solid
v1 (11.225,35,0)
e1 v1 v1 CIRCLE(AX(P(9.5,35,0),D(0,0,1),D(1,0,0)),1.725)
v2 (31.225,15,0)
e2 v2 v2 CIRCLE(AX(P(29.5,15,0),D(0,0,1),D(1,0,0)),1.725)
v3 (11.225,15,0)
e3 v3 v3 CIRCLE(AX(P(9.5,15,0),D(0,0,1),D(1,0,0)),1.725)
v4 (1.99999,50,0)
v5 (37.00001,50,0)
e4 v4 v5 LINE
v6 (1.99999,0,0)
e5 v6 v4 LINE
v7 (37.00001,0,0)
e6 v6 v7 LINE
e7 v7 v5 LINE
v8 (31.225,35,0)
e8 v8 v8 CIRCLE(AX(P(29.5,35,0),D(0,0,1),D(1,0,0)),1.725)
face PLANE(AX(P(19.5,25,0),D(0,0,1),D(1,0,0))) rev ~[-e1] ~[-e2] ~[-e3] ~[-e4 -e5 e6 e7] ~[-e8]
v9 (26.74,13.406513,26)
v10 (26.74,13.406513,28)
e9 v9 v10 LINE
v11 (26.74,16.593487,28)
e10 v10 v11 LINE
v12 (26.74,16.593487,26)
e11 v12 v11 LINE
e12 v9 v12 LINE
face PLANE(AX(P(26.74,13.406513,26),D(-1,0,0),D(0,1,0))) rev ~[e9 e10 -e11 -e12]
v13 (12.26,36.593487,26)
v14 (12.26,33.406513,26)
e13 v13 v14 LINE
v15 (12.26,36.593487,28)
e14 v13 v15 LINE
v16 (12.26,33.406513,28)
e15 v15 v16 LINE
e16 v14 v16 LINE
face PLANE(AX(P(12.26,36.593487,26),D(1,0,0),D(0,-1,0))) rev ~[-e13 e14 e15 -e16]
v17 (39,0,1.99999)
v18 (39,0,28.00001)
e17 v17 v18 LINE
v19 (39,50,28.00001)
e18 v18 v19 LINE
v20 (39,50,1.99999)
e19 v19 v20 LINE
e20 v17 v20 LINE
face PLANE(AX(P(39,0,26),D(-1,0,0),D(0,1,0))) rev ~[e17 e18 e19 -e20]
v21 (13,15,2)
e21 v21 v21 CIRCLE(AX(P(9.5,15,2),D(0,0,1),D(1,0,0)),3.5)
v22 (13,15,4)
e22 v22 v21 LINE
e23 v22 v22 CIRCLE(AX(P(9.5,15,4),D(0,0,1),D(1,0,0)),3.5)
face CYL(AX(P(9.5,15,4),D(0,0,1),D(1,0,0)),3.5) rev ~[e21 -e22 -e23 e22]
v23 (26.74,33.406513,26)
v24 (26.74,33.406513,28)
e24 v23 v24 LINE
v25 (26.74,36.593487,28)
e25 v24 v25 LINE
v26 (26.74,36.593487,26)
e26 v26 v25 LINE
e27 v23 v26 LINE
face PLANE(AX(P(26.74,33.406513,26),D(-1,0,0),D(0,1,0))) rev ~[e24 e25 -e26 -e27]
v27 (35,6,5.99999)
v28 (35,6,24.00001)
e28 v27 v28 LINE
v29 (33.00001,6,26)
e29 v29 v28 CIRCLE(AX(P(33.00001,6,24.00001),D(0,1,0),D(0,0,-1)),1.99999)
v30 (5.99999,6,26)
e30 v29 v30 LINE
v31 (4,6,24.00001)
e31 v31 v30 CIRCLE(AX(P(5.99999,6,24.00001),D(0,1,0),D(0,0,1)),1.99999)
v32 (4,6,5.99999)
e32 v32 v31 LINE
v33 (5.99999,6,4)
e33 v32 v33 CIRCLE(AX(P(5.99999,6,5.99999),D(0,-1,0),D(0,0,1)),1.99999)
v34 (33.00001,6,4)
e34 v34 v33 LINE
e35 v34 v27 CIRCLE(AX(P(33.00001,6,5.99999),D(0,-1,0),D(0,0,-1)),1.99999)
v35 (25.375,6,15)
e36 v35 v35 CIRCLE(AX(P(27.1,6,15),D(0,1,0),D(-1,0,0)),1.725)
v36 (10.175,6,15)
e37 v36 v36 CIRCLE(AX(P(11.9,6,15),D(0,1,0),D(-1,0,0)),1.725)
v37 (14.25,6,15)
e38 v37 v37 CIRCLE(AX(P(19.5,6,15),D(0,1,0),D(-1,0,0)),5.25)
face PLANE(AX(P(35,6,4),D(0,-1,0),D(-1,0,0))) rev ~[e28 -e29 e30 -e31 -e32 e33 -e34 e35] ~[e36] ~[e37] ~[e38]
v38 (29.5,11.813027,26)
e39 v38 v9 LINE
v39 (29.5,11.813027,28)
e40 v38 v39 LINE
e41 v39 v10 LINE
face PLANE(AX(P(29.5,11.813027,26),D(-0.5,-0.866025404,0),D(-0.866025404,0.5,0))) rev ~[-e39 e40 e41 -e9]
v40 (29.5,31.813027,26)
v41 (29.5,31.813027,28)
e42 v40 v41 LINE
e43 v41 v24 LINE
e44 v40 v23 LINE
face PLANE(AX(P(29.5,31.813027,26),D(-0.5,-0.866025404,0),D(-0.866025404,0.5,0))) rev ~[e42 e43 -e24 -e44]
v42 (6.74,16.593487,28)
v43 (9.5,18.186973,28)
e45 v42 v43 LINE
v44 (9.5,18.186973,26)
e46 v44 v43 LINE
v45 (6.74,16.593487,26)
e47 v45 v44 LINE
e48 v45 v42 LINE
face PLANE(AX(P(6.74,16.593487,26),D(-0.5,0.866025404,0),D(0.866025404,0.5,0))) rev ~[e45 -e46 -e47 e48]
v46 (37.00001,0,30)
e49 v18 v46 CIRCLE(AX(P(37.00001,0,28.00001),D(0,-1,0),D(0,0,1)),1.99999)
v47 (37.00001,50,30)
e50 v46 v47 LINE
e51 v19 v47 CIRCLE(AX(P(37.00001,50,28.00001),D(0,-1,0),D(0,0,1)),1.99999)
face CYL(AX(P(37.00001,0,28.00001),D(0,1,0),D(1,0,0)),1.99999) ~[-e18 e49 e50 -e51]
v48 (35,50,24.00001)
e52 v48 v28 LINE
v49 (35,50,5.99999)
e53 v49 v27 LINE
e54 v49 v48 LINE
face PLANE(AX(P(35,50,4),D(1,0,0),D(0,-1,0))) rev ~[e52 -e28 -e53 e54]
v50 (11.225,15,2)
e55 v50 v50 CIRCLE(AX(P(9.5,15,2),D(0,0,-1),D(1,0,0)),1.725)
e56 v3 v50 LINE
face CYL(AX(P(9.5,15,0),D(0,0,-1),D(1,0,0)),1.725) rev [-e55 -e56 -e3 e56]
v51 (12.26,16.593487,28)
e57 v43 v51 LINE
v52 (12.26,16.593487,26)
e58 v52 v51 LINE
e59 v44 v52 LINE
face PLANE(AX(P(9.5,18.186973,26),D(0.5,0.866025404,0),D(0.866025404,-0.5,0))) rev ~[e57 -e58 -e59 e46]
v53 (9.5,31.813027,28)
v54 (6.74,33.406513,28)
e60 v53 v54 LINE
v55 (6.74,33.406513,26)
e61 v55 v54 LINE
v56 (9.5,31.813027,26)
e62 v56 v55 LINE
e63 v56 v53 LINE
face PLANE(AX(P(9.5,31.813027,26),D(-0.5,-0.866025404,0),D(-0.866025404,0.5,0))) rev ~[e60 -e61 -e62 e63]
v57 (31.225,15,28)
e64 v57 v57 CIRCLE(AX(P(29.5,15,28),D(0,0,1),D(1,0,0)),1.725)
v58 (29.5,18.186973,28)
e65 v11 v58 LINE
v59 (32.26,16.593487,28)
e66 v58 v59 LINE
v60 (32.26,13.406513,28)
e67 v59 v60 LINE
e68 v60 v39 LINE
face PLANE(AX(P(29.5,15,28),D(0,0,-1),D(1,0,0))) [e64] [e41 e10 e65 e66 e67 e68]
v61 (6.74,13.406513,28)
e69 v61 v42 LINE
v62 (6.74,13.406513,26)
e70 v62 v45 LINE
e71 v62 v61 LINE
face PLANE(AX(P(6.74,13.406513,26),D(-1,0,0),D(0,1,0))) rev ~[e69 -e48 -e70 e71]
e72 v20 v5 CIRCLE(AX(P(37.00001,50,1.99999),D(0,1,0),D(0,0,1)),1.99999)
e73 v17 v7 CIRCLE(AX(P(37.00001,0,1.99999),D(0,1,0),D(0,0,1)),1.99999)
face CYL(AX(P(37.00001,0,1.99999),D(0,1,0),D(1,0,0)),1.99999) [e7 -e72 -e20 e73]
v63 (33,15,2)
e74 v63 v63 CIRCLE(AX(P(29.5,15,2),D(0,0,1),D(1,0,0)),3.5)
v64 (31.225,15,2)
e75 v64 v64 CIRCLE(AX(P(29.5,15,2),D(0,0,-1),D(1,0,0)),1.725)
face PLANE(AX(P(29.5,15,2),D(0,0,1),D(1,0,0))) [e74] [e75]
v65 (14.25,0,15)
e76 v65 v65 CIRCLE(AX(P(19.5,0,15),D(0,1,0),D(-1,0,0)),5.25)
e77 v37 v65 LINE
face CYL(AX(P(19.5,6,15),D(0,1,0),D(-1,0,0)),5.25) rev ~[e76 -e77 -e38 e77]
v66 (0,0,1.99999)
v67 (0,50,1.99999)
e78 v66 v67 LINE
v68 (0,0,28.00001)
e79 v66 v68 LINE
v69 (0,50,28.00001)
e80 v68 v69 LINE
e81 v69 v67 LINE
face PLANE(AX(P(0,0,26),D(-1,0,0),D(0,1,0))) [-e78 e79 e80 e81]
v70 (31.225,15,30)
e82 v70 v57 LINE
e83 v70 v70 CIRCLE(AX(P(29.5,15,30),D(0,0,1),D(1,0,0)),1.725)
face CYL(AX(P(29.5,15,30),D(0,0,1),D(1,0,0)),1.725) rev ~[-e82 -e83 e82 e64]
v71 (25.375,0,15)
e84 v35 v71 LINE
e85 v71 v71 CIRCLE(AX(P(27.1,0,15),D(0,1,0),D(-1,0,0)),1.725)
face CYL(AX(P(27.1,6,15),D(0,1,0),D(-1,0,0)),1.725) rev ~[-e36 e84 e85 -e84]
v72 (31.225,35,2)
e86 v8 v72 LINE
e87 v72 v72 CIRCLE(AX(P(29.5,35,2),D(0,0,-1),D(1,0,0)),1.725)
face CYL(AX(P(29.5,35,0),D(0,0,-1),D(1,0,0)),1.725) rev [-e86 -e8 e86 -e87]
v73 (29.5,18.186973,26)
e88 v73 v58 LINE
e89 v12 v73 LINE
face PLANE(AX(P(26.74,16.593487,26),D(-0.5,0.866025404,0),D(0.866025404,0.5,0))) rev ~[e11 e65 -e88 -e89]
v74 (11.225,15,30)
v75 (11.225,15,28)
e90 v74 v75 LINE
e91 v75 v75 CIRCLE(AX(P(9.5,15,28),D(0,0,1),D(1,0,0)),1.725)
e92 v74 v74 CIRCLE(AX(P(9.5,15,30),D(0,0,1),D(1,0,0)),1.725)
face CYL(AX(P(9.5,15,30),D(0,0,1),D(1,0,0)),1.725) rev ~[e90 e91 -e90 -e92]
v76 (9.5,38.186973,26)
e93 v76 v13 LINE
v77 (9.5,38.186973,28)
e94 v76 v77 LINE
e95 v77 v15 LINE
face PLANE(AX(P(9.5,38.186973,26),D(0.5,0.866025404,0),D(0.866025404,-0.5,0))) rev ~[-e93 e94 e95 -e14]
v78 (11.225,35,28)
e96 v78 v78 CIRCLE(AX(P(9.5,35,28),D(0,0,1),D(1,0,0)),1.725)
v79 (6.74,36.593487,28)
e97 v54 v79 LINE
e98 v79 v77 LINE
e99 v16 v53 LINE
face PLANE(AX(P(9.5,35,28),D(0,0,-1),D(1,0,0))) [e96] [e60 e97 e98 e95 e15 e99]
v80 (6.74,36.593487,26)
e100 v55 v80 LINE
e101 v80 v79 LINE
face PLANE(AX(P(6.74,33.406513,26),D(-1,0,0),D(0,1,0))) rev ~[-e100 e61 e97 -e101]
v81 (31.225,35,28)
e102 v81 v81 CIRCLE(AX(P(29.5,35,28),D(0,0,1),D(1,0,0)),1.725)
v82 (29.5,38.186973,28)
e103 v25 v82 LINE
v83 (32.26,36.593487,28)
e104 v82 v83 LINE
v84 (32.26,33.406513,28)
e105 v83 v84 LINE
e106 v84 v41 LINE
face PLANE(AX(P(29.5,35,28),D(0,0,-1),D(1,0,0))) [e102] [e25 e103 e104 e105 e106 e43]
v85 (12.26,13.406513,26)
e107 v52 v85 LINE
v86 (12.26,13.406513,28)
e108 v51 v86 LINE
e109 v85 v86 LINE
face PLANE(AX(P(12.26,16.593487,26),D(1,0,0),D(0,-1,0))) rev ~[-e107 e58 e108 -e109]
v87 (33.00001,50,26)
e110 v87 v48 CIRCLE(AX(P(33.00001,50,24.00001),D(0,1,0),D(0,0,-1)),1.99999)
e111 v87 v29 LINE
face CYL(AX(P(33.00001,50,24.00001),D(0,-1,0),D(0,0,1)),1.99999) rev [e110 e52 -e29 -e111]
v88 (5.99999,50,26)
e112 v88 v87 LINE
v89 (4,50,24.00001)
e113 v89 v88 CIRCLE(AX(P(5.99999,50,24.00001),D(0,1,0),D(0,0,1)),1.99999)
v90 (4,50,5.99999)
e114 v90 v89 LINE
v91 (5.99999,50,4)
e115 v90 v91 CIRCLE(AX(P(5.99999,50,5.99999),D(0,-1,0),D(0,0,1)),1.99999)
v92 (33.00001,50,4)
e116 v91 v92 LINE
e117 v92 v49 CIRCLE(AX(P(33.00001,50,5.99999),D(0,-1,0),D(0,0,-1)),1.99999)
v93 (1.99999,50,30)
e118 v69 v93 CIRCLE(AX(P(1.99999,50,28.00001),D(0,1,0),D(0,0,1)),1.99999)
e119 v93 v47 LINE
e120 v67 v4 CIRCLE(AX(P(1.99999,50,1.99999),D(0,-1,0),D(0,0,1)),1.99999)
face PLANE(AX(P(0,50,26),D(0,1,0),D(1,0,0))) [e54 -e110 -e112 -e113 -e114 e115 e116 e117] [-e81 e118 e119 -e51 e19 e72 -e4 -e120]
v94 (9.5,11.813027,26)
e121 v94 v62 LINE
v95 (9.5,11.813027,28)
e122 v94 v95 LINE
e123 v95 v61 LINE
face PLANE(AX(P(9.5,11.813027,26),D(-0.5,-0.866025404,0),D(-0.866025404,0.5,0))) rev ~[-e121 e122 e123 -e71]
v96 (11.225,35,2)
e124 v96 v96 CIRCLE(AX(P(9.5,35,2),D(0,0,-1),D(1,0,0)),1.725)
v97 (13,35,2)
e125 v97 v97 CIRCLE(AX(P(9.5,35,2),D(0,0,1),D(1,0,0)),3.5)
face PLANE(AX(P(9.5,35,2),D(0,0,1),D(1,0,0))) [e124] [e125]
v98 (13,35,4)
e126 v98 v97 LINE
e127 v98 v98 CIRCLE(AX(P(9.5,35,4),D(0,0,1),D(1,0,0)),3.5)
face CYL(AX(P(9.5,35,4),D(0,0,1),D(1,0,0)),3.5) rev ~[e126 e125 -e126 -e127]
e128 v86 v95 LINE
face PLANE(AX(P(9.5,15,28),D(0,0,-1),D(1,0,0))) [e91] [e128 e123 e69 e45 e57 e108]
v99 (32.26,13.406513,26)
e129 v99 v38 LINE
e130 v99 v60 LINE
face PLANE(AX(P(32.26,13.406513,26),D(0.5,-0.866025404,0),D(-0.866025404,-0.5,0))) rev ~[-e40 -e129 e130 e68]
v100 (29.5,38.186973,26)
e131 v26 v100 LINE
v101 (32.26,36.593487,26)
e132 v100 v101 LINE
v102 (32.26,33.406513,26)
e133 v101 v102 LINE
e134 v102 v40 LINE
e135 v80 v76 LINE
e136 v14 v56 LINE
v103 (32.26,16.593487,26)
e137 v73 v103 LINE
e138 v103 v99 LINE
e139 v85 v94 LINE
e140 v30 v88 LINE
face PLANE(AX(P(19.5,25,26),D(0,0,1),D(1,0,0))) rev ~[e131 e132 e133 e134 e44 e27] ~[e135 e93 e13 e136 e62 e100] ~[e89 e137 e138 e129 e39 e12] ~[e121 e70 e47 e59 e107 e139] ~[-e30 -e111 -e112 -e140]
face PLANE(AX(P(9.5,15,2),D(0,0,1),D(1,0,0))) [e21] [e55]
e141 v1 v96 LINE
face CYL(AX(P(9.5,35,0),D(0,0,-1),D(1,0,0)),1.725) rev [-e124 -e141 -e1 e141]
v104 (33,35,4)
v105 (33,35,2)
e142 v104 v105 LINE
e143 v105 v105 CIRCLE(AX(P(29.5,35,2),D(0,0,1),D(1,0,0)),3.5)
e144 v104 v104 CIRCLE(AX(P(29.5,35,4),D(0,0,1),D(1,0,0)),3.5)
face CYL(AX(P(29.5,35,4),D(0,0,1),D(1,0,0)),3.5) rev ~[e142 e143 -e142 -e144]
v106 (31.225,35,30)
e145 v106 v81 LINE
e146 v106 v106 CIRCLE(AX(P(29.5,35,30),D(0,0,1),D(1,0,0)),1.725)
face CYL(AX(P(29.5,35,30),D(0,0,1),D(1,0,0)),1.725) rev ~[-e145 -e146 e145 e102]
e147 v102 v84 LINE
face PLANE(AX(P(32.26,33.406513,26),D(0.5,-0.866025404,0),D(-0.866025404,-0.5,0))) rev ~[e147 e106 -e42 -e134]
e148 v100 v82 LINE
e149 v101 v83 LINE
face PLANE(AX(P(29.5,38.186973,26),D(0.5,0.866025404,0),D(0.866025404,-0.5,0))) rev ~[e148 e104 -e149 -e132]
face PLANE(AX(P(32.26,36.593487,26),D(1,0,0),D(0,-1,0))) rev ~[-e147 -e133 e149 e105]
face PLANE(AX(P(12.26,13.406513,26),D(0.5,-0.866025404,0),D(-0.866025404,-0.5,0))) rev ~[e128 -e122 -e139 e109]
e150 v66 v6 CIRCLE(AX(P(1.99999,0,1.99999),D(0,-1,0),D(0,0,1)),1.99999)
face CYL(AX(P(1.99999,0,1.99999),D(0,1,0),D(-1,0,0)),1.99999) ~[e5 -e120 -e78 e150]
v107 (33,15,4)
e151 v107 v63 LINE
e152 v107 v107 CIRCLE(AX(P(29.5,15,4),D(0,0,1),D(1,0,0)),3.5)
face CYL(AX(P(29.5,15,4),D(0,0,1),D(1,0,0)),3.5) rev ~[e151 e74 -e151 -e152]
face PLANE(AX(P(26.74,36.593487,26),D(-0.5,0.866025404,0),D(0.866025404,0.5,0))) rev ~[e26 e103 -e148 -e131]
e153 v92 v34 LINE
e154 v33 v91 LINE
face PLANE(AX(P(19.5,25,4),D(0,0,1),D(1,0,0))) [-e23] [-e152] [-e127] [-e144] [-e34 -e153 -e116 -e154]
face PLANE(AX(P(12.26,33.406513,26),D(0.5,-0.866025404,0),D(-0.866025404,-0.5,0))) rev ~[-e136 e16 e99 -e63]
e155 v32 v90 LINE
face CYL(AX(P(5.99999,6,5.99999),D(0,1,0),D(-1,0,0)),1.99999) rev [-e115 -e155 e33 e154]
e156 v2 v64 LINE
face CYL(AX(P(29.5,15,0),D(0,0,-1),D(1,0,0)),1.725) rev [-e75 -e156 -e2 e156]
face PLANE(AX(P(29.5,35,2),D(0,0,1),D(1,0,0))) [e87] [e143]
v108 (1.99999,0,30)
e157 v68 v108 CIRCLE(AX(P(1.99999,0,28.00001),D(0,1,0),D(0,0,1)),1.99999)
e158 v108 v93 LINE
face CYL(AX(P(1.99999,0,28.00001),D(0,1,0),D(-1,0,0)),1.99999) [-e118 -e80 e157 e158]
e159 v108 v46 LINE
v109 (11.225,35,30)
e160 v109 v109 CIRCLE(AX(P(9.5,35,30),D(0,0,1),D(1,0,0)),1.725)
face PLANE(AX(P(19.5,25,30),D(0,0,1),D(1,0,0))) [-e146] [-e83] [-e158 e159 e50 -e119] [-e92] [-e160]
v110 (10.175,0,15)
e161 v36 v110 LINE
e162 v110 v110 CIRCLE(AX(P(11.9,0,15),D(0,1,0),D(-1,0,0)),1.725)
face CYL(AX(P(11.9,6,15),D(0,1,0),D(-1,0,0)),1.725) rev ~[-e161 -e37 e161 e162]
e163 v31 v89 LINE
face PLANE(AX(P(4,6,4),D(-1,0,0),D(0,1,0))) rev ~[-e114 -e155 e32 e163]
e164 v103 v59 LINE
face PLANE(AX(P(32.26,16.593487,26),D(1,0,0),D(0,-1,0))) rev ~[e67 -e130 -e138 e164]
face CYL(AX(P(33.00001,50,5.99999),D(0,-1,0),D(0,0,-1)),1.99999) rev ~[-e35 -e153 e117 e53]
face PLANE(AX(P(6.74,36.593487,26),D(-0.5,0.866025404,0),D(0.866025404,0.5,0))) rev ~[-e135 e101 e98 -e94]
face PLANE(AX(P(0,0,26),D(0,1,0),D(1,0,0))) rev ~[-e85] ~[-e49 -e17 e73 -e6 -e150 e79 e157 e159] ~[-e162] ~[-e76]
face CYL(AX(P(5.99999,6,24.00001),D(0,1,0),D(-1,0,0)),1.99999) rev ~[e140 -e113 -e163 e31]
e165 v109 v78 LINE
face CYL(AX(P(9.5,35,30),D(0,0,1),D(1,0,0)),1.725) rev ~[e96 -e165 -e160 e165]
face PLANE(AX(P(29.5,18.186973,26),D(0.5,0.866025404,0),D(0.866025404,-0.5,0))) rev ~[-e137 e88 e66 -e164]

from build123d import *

# Parameters (mm, degrees)
F0_W      = 39
F0_H      = 50
F0_R      = 3.5
F0_R_2    = 1.725
F1_DEPTH  = 4
F2_R      = 3.5
F3_DEPTH  = 2
F5_DEPTH  = 22
F6_R      = 5.25
F6_R_2    = 1.725
F7_DEPTH  = 6
F8_W      = 39
F8_H      = 50
F9_DEPTH  = 4
F10_R     = 1.99999
F11_R     = 1.725
F12_DEPTH = 4
F14_DEPTH = 2


# Not quite as in the source:
# - a fillet or chamfer is up to 0.001 mm smaller than in the source, because OpenCascade refuses the exact size


with BuildPart() as f1:
    # F0 (on Top) → F1 (new body)
    with BuildSketch(Plane.XY):
        with Locations((19.5, 25)):
            Rectangle(F0_W, F0_H)
        with Locations((9.5, 15)):
            Circle(F0_R, mode=Mode.SUBTRACT)
        with Locations((29.5, 15)):
            Circle(F0_R, mode=Mode.SUBTRACT)
        with Locations((9.5, 35)):
            Circle(F0_R, mode=Mode.SUBTRACT)
        with Locations((29.5, 35)):
            Circle(F0_R, mode=Mode.SUBTRACT)
        with Locations((9.5, 35)):
            Circle(F0_R)
        with Locations((9.5, 35)):
            Circle(F0_R_2, mode=Mode.SUBTRACT)
        with Locations((29.5, 35)):
            Circle(F0_R)
        with Locations((29.5, 35)):
            Circle(F0_R_2, mode=Mode.SUBTRACT)
        with Locations((29.5, 15)):
            Circle(F0_R)
        with Locations((29.5, 15)):
            Circle(F0_R_2, mode=Mode.SUBTRACT)
        with Locations((9.5, 15)):
            Circle(F0_R)
        with Locations((9.5, 15)):
            Circle(F0_R_2, mode=Mode.SUBTRACT)
    extrude(amount=F1_DEPTH)

    # F2 (on face) → F3 (cut)
    with BuildSketch(Plane.XY.offset(4)):
        with Locations((9.5, 35)):
            Circle(F2_R)
        with Locations((29.5, 35)):
            Circle(F2_R)
        with Locations((29.5, 15)):
            Circle(F2_R)
        with Locations((9.5, 15)):
            Circle(F2_R)
    extrude(amount=-F3_DEPTH, mode=Mode.SUBTRACT)

    # F4 (on face) → F5 (join)
    with BuildSketch(Plane.XY.offset(4)):
        Polygon((4, 50), (0, 50), (0, 0), (39, 0), (39, 50), (35, 50), (35, 6), (4, 6), align=None)
    extrude(amount=F5_DEPTH)

    # F6 (on face) → F7 (cut, through all)
    with BuildSketch(Plane(origin=(0, 6, 0), x_dir=(-1, 0, 0), z_dir=(0, 1, 0))):
        with Locations((-19.5, 15)):
            Circle(F6_R)
        with Locations((-27.1, 15)):
            Circle(F6_R_2)
        with Locations((-11.9, 15)):
            Circle(F6_R_2)
    extrude(amount=-F7_DEPTH, mode=Mode.SUBTRACT)

    # F8 (on face) → F9 (join)
    with BuildSketch(Plane.XY.offset(26)):
        with Locations((19.5, 25)):
            Rectangle(F8_W, F8_H)
    extrude(amount=F9_DEPTH)

    # F10 (radius 2 in the source; OpenCascade refuses exactly that, so slightly less here)
    f10_edges = [f1.edges().sort_by_distance(p)[0] for p in [
        (0, 25, 30),
        (0, 25, 0),
        (39, 25, 0),
        (39, 25, 30),
        (35, 28, 26),
        (4, 28, 26),
        (4, 28, 4),
        (35, 28, 4),
    ]]
    fillet(f10_edges, radius=F10_R)

    # F11 (on face) → F12 (cut, through all)
    with BuildSketch(Plane.XY.offset(30)):
        with Locations((9.5, 35)):
            Circle(F11_R)
        with Locations((29.5, 35)):
            Circle(F11_R)
        with Locations((29.5, 15)):
            Circle(F11_R)
        with Locations((9.5, 15)):
            Circle(F11_R)
    extrude(amount=-F12_DEPTH, mode=Mode.SUBTRACT)

    # F13 (on face) → F14 (cut)
    with BuildSketch(Plane(origin=(0, 0, 26), x_dir=(1, 0, 0), z_dir=(0, 0, -1))):
        Polygon((12.26, -13.406513257), (9.5, -11.8130265141), (6.74, -13.406513257), (6.74, -16.593486743), (9.5, -18.1869734859), (12.26, -16.593486743), align=None)
        Polygon((32.26, -13.406513257), (29.5, -11.8130265141), (26.74, -13.406513257), (26.74, -16.593486743), (29.5, -18.1869734859), (32.26, -16.593486743), align=None)
        Polygon((32.26, -33.406513257), (29.5, -31.8130265141), (26.74, -33.406513257), (26.74, -36.593486743), (29.5, -38.1869734859), (32.26, -36.593486743), align=None)
        Polygon((12.26, -33.406513257), (9.5, -31.8130265141), (6.74, -33.406513257), (6.74, -36.593486743), (9.5, -38.1869734859), (12.26, -36.593486743), align=None)
    extrude(amount=-F14_DEPTH, mode=Mode.SUBTRACT)


solid = f1.part
